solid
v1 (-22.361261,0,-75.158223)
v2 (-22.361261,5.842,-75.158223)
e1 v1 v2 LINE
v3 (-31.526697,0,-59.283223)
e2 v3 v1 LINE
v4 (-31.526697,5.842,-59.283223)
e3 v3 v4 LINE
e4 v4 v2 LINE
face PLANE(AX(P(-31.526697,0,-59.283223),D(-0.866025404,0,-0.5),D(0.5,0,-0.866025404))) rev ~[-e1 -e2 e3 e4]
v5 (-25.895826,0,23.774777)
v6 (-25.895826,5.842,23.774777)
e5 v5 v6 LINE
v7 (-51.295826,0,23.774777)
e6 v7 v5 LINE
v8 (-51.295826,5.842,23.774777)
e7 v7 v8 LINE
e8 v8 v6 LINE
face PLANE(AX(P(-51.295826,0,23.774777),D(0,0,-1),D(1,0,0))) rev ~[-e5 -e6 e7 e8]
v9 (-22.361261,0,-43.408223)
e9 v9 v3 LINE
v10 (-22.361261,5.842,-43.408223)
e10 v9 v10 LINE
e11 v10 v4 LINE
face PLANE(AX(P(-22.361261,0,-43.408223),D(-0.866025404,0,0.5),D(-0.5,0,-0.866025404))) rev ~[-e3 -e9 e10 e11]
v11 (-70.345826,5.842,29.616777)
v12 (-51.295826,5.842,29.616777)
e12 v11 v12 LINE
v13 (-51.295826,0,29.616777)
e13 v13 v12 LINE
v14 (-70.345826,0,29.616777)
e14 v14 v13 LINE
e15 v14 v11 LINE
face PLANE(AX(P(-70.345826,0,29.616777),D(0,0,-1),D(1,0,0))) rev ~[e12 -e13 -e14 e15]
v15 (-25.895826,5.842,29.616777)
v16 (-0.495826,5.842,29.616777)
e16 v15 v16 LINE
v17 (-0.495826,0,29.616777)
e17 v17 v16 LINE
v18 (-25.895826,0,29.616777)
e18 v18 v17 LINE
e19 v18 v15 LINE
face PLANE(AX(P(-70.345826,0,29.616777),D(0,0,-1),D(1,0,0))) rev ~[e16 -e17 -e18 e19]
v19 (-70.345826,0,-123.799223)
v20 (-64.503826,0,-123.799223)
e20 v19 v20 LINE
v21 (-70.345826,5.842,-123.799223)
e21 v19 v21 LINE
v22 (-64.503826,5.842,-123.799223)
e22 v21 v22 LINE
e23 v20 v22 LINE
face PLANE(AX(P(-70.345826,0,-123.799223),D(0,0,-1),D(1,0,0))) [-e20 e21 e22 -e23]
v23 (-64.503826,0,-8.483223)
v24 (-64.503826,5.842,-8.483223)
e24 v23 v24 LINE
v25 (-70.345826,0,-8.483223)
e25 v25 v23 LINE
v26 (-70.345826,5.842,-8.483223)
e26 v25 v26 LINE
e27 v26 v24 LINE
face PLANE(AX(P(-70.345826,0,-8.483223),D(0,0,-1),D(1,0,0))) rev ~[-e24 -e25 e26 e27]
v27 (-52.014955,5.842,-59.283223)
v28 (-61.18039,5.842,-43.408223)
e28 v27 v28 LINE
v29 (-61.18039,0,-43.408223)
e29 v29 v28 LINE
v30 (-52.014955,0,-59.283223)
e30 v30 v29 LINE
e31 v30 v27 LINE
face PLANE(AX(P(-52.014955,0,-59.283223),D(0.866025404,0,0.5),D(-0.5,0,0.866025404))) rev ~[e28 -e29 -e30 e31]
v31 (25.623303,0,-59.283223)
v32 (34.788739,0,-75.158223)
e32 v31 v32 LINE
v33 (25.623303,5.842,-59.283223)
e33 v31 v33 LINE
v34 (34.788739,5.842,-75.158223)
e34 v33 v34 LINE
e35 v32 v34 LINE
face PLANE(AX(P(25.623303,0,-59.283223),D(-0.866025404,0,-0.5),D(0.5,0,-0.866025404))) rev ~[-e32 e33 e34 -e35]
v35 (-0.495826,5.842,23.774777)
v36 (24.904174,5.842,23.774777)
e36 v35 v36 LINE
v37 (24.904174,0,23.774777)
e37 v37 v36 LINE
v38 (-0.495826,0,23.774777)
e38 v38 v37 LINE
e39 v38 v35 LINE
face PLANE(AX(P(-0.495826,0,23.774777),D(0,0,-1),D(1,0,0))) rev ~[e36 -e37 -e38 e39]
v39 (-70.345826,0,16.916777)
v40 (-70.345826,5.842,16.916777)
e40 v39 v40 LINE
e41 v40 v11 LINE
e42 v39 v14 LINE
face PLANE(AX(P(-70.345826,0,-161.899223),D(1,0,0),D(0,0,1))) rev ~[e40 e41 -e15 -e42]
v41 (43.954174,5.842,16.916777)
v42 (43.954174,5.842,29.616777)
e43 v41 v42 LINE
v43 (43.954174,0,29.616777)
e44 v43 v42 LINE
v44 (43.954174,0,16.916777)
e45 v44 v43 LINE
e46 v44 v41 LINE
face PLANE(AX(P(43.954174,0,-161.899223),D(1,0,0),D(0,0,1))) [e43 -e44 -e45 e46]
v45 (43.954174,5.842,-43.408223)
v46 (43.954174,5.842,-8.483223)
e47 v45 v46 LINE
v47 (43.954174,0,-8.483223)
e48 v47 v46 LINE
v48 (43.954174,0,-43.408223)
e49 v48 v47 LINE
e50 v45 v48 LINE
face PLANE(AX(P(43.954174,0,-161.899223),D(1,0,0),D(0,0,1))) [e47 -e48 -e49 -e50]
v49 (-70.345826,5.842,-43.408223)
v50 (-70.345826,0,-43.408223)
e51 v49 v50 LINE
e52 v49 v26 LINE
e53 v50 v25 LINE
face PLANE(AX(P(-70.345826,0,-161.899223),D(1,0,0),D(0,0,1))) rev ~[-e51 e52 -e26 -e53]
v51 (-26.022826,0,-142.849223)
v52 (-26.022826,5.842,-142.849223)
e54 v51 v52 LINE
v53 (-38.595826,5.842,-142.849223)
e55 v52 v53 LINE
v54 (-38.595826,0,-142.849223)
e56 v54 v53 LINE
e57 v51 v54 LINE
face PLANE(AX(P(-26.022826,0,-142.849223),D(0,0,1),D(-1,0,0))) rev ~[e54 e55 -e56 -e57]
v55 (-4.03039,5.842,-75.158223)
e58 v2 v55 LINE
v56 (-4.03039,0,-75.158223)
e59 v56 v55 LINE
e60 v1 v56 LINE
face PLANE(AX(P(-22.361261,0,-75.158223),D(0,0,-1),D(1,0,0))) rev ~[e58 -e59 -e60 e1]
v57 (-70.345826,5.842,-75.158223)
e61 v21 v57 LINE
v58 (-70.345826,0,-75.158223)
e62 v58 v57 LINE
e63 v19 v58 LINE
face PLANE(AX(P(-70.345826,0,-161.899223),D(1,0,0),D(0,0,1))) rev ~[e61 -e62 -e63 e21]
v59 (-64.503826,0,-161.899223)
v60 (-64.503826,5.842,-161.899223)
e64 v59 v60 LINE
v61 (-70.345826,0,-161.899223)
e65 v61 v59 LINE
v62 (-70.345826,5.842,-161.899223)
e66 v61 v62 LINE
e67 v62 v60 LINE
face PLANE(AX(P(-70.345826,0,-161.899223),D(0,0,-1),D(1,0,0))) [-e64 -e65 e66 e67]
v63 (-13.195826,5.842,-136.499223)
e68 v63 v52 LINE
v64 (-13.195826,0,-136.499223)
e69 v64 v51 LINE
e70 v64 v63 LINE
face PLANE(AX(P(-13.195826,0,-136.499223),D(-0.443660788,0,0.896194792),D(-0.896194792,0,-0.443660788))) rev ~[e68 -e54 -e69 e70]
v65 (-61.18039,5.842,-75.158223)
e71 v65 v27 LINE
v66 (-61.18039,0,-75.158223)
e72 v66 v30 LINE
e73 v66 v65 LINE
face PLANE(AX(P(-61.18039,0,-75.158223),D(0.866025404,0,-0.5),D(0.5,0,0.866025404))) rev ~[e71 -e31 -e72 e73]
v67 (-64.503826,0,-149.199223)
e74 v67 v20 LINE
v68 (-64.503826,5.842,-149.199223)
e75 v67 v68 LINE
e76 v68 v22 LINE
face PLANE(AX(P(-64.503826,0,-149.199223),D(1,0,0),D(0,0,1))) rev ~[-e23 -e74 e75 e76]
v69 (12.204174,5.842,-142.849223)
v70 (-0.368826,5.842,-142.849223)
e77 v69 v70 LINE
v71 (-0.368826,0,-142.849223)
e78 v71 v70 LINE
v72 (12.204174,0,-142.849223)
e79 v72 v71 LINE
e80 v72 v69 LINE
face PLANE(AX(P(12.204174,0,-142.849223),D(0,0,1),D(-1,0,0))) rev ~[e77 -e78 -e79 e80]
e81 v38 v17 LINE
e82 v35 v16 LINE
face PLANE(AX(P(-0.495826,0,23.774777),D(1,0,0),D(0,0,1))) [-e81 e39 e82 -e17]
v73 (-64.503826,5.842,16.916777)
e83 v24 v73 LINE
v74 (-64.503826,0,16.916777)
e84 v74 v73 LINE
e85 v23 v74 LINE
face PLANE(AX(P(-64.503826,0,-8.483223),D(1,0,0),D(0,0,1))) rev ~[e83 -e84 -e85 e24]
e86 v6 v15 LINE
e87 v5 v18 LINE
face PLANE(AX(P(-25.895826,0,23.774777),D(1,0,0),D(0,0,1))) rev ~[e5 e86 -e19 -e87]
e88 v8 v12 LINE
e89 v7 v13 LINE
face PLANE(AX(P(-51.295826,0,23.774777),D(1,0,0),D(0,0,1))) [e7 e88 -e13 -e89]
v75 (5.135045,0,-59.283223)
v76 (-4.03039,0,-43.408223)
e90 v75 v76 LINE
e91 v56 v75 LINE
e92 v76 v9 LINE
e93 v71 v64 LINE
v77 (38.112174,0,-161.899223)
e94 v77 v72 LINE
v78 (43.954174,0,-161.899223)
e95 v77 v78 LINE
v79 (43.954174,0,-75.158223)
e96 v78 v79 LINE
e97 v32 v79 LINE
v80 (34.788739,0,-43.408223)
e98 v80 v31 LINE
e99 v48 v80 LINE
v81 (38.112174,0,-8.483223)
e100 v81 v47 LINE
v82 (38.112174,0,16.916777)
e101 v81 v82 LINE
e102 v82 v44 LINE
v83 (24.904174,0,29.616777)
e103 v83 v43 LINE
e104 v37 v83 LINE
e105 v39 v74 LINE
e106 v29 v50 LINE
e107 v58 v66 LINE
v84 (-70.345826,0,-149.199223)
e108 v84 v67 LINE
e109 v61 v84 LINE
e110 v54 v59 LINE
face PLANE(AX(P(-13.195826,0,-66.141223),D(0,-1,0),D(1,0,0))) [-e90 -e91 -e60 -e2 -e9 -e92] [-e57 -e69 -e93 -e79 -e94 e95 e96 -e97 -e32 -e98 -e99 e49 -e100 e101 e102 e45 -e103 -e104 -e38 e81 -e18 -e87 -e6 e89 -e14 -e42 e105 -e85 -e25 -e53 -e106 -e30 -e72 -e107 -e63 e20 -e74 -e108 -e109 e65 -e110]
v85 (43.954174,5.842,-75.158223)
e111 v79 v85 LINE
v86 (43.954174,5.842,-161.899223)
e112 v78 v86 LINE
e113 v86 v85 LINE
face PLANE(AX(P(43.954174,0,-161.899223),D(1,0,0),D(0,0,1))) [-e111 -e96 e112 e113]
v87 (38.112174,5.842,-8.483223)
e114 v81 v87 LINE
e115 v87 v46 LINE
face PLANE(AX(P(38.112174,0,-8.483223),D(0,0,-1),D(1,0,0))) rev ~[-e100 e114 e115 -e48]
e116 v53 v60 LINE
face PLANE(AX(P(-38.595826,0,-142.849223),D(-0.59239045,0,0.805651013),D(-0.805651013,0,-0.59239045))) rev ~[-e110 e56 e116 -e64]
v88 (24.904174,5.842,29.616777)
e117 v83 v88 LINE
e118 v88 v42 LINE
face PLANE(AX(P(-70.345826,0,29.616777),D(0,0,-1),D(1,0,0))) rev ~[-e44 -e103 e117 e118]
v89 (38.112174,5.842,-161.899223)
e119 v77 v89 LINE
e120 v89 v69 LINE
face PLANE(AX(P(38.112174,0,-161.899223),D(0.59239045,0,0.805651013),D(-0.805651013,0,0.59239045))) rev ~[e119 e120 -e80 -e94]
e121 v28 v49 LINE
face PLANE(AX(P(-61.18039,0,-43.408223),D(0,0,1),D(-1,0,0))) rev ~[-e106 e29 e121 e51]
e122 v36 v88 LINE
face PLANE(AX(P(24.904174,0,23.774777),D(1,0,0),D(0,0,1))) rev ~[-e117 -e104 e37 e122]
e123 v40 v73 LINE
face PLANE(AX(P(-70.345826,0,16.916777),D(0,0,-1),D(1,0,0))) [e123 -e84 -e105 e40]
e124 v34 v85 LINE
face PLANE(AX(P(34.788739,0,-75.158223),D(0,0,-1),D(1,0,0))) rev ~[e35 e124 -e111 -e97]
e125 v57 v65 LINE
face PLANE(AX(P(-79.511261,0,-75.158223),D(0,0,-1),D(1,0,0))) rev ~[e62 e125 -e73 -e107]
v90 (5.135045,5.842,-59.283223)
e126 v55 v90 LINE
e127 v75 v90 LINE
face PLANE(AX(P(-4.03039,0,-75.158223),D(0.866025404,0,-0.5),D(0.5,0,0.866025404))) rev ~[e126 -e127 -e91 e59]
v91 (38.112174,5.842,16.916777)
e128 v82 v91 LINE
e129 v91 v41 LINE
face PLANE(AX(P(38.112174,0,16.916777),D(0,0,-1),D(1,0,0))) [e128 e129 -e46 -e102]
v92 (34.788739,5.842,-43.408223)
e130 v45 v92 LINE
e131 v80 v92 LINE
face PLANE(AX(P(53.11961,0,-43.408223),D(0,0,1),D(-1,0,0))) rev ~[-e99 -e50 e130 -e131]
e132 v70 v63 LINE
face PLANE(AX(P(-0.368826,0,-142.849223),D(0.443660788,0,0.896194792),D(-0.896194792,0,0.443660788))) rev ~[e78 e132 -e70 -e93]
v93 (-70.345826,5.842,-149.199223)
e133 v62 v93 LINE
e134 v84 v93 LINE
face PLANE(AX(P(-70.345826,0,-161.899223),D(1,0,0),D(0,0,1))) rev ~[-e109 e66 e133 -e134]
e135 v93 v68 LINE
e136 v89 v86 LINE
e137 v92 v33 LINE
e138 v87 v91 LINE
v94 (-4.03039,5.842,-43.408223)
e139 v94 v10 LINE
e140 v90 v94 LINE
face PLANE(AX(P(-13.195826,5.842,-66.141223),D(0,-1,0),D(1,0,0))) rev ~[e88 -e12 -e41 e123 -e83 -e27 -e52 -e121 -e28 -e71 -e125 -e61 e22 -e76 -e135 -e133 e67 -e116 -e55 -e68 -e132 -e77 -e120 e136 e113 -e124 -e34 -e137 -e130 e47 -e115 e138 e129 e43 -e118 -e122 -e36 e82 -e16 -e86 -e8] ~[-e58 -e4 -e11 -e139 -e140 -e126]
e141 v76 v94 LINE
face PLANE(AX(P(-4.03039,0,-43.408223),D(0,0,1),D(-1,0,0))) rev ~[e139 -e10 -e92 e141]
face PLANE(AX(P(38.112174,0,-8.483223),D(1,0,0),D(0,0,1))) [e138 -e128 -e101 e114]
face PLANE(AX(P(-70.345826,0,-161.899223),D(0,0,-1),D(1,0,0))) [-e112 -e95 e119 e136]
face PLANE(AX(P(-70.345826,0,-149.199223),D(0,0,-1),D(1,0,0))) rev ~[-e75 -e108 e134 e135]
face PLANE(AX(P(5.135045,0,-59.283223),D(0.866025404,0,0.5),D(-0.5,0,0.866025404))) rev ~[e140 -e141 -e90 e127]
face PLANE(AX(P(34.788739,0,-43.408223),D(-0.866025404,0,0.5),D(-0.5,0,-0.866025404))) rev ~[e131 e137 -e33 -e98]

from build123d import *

# Parameters (mm, degrees)
F0_W     = 114.3
F0_H     = 191.516
F1_DEPTH = 5.842
F2_W     = 5.842
F2_H     = 25.4
F2_W_2   = 25.4
F2_H_2   = 5.842
F3_DEPTH = 5.842
F5_DEPTH = 5.842


# Not quite as in the source:
# - a feature names something its author has since deleted; it is built from what else it names


with BuildPart() as f1:
    # F0 (on Front) → F1 (new body)
    with BuildSketch(Plane.XZ):
        with Locations((-13.1958257407, -66.1412229082)):
            Rectangle(F0_W, F0_H)
    extrude(amount=-F1_DEPTH)

    # F2 (on face) → F3 (cut, through all)
    with BuildSketch(Plane.XZ):
        with Locations((-67.4248257407, 4.2167770918)):
            Rectangle(F2_W, F2_H)
        with Locations((-67.4248257407, -136.4992229082)):
            Rectangle(F2_W, F2_H)
        with Locations((41.0331742593, 4.2167770918)):
            Rectangle(F2_W, F2_H)
        with Locations((-38.5958257407, 26.6957770918)):
            Rectangle(F2_W_2, F2_H_2)
        with Locations((12.2041742593, 26.6957770918)):
            Rectangle(F2_W_2, F2_H_2)
        Polygon((-70.3458257407, -75.1582229082), (-70.3458257407, -43.4082229082), (-79.5112612641, -43.4082229082), (-88.6766967875, -59.2832229082), (-79.5112612641, -75.1582229082), align=None)
        Polygon((-61.1803902173, -43.4082229082), (-70.3458257407, -43.4082229082), (-70.3458257407, -75.1582229082), (-61.1803902173, -75.1582229082), (-52.0149546939, -59.2832229082), align=None)
        Polygon((43.9541742593, -75.1582229082), (43.9541742593, -43.4082229082), (34.7887387359, -43.4082229082), (25.6233032125, -59.2832229082), (34.7887387359, -75.1582229082), align=None)
        Polygon((53.1196097827, -43.4082229082), (43.9541742593, -43.4082229082), (43.9541742593, -75.1582229082), (53.1196097827, -75.1582229082), (62.2850453061, -59.2832229082), align=None)
        Polygon((-26.0228257407, -142.8492229082), (-64.5038257407, -161.8992229082), (38.1121742593, -161.8992229082), (-0.3688257407, -142.8492229082), align=None)
        Polygon((-13.1958257407, -136.4992229082), (-26.0228257407, -142.8492229082), (-0.3688257407, -142.8492229082), align=None)
        Polygon((-38.5958257407, -142.8492229082), (-64.5038257407, -161.8992229082), (-26.0228257407, -142.8492229082), align=None)
        Polygon((-0.3688257407, -142.8492229082), (38.1121742593, -161.8992229082), (12.2041742593, -142.8492229082), align=None)
    extrude(amount=-F3_DEPTH, mode=Mode.SUBTRACT)

    # F4 (on face) → F5 (cut, through all)
    with BuildSketch(Plane.XZ):
        Polygon((5.1350453061, -59.2832229082), (-4.0303902173, -43.4082229082), (-22.3612612641, -43.4082229082), (-31.5266967875, -59.2832229082), (-22.3612612641, -75.1582229082), (-4.0303902173, -75.1582229082), align=None)
    extrude(amount=-F5_DEPTH, mode=Mode.SUBTRACT)


solid = f1.part
